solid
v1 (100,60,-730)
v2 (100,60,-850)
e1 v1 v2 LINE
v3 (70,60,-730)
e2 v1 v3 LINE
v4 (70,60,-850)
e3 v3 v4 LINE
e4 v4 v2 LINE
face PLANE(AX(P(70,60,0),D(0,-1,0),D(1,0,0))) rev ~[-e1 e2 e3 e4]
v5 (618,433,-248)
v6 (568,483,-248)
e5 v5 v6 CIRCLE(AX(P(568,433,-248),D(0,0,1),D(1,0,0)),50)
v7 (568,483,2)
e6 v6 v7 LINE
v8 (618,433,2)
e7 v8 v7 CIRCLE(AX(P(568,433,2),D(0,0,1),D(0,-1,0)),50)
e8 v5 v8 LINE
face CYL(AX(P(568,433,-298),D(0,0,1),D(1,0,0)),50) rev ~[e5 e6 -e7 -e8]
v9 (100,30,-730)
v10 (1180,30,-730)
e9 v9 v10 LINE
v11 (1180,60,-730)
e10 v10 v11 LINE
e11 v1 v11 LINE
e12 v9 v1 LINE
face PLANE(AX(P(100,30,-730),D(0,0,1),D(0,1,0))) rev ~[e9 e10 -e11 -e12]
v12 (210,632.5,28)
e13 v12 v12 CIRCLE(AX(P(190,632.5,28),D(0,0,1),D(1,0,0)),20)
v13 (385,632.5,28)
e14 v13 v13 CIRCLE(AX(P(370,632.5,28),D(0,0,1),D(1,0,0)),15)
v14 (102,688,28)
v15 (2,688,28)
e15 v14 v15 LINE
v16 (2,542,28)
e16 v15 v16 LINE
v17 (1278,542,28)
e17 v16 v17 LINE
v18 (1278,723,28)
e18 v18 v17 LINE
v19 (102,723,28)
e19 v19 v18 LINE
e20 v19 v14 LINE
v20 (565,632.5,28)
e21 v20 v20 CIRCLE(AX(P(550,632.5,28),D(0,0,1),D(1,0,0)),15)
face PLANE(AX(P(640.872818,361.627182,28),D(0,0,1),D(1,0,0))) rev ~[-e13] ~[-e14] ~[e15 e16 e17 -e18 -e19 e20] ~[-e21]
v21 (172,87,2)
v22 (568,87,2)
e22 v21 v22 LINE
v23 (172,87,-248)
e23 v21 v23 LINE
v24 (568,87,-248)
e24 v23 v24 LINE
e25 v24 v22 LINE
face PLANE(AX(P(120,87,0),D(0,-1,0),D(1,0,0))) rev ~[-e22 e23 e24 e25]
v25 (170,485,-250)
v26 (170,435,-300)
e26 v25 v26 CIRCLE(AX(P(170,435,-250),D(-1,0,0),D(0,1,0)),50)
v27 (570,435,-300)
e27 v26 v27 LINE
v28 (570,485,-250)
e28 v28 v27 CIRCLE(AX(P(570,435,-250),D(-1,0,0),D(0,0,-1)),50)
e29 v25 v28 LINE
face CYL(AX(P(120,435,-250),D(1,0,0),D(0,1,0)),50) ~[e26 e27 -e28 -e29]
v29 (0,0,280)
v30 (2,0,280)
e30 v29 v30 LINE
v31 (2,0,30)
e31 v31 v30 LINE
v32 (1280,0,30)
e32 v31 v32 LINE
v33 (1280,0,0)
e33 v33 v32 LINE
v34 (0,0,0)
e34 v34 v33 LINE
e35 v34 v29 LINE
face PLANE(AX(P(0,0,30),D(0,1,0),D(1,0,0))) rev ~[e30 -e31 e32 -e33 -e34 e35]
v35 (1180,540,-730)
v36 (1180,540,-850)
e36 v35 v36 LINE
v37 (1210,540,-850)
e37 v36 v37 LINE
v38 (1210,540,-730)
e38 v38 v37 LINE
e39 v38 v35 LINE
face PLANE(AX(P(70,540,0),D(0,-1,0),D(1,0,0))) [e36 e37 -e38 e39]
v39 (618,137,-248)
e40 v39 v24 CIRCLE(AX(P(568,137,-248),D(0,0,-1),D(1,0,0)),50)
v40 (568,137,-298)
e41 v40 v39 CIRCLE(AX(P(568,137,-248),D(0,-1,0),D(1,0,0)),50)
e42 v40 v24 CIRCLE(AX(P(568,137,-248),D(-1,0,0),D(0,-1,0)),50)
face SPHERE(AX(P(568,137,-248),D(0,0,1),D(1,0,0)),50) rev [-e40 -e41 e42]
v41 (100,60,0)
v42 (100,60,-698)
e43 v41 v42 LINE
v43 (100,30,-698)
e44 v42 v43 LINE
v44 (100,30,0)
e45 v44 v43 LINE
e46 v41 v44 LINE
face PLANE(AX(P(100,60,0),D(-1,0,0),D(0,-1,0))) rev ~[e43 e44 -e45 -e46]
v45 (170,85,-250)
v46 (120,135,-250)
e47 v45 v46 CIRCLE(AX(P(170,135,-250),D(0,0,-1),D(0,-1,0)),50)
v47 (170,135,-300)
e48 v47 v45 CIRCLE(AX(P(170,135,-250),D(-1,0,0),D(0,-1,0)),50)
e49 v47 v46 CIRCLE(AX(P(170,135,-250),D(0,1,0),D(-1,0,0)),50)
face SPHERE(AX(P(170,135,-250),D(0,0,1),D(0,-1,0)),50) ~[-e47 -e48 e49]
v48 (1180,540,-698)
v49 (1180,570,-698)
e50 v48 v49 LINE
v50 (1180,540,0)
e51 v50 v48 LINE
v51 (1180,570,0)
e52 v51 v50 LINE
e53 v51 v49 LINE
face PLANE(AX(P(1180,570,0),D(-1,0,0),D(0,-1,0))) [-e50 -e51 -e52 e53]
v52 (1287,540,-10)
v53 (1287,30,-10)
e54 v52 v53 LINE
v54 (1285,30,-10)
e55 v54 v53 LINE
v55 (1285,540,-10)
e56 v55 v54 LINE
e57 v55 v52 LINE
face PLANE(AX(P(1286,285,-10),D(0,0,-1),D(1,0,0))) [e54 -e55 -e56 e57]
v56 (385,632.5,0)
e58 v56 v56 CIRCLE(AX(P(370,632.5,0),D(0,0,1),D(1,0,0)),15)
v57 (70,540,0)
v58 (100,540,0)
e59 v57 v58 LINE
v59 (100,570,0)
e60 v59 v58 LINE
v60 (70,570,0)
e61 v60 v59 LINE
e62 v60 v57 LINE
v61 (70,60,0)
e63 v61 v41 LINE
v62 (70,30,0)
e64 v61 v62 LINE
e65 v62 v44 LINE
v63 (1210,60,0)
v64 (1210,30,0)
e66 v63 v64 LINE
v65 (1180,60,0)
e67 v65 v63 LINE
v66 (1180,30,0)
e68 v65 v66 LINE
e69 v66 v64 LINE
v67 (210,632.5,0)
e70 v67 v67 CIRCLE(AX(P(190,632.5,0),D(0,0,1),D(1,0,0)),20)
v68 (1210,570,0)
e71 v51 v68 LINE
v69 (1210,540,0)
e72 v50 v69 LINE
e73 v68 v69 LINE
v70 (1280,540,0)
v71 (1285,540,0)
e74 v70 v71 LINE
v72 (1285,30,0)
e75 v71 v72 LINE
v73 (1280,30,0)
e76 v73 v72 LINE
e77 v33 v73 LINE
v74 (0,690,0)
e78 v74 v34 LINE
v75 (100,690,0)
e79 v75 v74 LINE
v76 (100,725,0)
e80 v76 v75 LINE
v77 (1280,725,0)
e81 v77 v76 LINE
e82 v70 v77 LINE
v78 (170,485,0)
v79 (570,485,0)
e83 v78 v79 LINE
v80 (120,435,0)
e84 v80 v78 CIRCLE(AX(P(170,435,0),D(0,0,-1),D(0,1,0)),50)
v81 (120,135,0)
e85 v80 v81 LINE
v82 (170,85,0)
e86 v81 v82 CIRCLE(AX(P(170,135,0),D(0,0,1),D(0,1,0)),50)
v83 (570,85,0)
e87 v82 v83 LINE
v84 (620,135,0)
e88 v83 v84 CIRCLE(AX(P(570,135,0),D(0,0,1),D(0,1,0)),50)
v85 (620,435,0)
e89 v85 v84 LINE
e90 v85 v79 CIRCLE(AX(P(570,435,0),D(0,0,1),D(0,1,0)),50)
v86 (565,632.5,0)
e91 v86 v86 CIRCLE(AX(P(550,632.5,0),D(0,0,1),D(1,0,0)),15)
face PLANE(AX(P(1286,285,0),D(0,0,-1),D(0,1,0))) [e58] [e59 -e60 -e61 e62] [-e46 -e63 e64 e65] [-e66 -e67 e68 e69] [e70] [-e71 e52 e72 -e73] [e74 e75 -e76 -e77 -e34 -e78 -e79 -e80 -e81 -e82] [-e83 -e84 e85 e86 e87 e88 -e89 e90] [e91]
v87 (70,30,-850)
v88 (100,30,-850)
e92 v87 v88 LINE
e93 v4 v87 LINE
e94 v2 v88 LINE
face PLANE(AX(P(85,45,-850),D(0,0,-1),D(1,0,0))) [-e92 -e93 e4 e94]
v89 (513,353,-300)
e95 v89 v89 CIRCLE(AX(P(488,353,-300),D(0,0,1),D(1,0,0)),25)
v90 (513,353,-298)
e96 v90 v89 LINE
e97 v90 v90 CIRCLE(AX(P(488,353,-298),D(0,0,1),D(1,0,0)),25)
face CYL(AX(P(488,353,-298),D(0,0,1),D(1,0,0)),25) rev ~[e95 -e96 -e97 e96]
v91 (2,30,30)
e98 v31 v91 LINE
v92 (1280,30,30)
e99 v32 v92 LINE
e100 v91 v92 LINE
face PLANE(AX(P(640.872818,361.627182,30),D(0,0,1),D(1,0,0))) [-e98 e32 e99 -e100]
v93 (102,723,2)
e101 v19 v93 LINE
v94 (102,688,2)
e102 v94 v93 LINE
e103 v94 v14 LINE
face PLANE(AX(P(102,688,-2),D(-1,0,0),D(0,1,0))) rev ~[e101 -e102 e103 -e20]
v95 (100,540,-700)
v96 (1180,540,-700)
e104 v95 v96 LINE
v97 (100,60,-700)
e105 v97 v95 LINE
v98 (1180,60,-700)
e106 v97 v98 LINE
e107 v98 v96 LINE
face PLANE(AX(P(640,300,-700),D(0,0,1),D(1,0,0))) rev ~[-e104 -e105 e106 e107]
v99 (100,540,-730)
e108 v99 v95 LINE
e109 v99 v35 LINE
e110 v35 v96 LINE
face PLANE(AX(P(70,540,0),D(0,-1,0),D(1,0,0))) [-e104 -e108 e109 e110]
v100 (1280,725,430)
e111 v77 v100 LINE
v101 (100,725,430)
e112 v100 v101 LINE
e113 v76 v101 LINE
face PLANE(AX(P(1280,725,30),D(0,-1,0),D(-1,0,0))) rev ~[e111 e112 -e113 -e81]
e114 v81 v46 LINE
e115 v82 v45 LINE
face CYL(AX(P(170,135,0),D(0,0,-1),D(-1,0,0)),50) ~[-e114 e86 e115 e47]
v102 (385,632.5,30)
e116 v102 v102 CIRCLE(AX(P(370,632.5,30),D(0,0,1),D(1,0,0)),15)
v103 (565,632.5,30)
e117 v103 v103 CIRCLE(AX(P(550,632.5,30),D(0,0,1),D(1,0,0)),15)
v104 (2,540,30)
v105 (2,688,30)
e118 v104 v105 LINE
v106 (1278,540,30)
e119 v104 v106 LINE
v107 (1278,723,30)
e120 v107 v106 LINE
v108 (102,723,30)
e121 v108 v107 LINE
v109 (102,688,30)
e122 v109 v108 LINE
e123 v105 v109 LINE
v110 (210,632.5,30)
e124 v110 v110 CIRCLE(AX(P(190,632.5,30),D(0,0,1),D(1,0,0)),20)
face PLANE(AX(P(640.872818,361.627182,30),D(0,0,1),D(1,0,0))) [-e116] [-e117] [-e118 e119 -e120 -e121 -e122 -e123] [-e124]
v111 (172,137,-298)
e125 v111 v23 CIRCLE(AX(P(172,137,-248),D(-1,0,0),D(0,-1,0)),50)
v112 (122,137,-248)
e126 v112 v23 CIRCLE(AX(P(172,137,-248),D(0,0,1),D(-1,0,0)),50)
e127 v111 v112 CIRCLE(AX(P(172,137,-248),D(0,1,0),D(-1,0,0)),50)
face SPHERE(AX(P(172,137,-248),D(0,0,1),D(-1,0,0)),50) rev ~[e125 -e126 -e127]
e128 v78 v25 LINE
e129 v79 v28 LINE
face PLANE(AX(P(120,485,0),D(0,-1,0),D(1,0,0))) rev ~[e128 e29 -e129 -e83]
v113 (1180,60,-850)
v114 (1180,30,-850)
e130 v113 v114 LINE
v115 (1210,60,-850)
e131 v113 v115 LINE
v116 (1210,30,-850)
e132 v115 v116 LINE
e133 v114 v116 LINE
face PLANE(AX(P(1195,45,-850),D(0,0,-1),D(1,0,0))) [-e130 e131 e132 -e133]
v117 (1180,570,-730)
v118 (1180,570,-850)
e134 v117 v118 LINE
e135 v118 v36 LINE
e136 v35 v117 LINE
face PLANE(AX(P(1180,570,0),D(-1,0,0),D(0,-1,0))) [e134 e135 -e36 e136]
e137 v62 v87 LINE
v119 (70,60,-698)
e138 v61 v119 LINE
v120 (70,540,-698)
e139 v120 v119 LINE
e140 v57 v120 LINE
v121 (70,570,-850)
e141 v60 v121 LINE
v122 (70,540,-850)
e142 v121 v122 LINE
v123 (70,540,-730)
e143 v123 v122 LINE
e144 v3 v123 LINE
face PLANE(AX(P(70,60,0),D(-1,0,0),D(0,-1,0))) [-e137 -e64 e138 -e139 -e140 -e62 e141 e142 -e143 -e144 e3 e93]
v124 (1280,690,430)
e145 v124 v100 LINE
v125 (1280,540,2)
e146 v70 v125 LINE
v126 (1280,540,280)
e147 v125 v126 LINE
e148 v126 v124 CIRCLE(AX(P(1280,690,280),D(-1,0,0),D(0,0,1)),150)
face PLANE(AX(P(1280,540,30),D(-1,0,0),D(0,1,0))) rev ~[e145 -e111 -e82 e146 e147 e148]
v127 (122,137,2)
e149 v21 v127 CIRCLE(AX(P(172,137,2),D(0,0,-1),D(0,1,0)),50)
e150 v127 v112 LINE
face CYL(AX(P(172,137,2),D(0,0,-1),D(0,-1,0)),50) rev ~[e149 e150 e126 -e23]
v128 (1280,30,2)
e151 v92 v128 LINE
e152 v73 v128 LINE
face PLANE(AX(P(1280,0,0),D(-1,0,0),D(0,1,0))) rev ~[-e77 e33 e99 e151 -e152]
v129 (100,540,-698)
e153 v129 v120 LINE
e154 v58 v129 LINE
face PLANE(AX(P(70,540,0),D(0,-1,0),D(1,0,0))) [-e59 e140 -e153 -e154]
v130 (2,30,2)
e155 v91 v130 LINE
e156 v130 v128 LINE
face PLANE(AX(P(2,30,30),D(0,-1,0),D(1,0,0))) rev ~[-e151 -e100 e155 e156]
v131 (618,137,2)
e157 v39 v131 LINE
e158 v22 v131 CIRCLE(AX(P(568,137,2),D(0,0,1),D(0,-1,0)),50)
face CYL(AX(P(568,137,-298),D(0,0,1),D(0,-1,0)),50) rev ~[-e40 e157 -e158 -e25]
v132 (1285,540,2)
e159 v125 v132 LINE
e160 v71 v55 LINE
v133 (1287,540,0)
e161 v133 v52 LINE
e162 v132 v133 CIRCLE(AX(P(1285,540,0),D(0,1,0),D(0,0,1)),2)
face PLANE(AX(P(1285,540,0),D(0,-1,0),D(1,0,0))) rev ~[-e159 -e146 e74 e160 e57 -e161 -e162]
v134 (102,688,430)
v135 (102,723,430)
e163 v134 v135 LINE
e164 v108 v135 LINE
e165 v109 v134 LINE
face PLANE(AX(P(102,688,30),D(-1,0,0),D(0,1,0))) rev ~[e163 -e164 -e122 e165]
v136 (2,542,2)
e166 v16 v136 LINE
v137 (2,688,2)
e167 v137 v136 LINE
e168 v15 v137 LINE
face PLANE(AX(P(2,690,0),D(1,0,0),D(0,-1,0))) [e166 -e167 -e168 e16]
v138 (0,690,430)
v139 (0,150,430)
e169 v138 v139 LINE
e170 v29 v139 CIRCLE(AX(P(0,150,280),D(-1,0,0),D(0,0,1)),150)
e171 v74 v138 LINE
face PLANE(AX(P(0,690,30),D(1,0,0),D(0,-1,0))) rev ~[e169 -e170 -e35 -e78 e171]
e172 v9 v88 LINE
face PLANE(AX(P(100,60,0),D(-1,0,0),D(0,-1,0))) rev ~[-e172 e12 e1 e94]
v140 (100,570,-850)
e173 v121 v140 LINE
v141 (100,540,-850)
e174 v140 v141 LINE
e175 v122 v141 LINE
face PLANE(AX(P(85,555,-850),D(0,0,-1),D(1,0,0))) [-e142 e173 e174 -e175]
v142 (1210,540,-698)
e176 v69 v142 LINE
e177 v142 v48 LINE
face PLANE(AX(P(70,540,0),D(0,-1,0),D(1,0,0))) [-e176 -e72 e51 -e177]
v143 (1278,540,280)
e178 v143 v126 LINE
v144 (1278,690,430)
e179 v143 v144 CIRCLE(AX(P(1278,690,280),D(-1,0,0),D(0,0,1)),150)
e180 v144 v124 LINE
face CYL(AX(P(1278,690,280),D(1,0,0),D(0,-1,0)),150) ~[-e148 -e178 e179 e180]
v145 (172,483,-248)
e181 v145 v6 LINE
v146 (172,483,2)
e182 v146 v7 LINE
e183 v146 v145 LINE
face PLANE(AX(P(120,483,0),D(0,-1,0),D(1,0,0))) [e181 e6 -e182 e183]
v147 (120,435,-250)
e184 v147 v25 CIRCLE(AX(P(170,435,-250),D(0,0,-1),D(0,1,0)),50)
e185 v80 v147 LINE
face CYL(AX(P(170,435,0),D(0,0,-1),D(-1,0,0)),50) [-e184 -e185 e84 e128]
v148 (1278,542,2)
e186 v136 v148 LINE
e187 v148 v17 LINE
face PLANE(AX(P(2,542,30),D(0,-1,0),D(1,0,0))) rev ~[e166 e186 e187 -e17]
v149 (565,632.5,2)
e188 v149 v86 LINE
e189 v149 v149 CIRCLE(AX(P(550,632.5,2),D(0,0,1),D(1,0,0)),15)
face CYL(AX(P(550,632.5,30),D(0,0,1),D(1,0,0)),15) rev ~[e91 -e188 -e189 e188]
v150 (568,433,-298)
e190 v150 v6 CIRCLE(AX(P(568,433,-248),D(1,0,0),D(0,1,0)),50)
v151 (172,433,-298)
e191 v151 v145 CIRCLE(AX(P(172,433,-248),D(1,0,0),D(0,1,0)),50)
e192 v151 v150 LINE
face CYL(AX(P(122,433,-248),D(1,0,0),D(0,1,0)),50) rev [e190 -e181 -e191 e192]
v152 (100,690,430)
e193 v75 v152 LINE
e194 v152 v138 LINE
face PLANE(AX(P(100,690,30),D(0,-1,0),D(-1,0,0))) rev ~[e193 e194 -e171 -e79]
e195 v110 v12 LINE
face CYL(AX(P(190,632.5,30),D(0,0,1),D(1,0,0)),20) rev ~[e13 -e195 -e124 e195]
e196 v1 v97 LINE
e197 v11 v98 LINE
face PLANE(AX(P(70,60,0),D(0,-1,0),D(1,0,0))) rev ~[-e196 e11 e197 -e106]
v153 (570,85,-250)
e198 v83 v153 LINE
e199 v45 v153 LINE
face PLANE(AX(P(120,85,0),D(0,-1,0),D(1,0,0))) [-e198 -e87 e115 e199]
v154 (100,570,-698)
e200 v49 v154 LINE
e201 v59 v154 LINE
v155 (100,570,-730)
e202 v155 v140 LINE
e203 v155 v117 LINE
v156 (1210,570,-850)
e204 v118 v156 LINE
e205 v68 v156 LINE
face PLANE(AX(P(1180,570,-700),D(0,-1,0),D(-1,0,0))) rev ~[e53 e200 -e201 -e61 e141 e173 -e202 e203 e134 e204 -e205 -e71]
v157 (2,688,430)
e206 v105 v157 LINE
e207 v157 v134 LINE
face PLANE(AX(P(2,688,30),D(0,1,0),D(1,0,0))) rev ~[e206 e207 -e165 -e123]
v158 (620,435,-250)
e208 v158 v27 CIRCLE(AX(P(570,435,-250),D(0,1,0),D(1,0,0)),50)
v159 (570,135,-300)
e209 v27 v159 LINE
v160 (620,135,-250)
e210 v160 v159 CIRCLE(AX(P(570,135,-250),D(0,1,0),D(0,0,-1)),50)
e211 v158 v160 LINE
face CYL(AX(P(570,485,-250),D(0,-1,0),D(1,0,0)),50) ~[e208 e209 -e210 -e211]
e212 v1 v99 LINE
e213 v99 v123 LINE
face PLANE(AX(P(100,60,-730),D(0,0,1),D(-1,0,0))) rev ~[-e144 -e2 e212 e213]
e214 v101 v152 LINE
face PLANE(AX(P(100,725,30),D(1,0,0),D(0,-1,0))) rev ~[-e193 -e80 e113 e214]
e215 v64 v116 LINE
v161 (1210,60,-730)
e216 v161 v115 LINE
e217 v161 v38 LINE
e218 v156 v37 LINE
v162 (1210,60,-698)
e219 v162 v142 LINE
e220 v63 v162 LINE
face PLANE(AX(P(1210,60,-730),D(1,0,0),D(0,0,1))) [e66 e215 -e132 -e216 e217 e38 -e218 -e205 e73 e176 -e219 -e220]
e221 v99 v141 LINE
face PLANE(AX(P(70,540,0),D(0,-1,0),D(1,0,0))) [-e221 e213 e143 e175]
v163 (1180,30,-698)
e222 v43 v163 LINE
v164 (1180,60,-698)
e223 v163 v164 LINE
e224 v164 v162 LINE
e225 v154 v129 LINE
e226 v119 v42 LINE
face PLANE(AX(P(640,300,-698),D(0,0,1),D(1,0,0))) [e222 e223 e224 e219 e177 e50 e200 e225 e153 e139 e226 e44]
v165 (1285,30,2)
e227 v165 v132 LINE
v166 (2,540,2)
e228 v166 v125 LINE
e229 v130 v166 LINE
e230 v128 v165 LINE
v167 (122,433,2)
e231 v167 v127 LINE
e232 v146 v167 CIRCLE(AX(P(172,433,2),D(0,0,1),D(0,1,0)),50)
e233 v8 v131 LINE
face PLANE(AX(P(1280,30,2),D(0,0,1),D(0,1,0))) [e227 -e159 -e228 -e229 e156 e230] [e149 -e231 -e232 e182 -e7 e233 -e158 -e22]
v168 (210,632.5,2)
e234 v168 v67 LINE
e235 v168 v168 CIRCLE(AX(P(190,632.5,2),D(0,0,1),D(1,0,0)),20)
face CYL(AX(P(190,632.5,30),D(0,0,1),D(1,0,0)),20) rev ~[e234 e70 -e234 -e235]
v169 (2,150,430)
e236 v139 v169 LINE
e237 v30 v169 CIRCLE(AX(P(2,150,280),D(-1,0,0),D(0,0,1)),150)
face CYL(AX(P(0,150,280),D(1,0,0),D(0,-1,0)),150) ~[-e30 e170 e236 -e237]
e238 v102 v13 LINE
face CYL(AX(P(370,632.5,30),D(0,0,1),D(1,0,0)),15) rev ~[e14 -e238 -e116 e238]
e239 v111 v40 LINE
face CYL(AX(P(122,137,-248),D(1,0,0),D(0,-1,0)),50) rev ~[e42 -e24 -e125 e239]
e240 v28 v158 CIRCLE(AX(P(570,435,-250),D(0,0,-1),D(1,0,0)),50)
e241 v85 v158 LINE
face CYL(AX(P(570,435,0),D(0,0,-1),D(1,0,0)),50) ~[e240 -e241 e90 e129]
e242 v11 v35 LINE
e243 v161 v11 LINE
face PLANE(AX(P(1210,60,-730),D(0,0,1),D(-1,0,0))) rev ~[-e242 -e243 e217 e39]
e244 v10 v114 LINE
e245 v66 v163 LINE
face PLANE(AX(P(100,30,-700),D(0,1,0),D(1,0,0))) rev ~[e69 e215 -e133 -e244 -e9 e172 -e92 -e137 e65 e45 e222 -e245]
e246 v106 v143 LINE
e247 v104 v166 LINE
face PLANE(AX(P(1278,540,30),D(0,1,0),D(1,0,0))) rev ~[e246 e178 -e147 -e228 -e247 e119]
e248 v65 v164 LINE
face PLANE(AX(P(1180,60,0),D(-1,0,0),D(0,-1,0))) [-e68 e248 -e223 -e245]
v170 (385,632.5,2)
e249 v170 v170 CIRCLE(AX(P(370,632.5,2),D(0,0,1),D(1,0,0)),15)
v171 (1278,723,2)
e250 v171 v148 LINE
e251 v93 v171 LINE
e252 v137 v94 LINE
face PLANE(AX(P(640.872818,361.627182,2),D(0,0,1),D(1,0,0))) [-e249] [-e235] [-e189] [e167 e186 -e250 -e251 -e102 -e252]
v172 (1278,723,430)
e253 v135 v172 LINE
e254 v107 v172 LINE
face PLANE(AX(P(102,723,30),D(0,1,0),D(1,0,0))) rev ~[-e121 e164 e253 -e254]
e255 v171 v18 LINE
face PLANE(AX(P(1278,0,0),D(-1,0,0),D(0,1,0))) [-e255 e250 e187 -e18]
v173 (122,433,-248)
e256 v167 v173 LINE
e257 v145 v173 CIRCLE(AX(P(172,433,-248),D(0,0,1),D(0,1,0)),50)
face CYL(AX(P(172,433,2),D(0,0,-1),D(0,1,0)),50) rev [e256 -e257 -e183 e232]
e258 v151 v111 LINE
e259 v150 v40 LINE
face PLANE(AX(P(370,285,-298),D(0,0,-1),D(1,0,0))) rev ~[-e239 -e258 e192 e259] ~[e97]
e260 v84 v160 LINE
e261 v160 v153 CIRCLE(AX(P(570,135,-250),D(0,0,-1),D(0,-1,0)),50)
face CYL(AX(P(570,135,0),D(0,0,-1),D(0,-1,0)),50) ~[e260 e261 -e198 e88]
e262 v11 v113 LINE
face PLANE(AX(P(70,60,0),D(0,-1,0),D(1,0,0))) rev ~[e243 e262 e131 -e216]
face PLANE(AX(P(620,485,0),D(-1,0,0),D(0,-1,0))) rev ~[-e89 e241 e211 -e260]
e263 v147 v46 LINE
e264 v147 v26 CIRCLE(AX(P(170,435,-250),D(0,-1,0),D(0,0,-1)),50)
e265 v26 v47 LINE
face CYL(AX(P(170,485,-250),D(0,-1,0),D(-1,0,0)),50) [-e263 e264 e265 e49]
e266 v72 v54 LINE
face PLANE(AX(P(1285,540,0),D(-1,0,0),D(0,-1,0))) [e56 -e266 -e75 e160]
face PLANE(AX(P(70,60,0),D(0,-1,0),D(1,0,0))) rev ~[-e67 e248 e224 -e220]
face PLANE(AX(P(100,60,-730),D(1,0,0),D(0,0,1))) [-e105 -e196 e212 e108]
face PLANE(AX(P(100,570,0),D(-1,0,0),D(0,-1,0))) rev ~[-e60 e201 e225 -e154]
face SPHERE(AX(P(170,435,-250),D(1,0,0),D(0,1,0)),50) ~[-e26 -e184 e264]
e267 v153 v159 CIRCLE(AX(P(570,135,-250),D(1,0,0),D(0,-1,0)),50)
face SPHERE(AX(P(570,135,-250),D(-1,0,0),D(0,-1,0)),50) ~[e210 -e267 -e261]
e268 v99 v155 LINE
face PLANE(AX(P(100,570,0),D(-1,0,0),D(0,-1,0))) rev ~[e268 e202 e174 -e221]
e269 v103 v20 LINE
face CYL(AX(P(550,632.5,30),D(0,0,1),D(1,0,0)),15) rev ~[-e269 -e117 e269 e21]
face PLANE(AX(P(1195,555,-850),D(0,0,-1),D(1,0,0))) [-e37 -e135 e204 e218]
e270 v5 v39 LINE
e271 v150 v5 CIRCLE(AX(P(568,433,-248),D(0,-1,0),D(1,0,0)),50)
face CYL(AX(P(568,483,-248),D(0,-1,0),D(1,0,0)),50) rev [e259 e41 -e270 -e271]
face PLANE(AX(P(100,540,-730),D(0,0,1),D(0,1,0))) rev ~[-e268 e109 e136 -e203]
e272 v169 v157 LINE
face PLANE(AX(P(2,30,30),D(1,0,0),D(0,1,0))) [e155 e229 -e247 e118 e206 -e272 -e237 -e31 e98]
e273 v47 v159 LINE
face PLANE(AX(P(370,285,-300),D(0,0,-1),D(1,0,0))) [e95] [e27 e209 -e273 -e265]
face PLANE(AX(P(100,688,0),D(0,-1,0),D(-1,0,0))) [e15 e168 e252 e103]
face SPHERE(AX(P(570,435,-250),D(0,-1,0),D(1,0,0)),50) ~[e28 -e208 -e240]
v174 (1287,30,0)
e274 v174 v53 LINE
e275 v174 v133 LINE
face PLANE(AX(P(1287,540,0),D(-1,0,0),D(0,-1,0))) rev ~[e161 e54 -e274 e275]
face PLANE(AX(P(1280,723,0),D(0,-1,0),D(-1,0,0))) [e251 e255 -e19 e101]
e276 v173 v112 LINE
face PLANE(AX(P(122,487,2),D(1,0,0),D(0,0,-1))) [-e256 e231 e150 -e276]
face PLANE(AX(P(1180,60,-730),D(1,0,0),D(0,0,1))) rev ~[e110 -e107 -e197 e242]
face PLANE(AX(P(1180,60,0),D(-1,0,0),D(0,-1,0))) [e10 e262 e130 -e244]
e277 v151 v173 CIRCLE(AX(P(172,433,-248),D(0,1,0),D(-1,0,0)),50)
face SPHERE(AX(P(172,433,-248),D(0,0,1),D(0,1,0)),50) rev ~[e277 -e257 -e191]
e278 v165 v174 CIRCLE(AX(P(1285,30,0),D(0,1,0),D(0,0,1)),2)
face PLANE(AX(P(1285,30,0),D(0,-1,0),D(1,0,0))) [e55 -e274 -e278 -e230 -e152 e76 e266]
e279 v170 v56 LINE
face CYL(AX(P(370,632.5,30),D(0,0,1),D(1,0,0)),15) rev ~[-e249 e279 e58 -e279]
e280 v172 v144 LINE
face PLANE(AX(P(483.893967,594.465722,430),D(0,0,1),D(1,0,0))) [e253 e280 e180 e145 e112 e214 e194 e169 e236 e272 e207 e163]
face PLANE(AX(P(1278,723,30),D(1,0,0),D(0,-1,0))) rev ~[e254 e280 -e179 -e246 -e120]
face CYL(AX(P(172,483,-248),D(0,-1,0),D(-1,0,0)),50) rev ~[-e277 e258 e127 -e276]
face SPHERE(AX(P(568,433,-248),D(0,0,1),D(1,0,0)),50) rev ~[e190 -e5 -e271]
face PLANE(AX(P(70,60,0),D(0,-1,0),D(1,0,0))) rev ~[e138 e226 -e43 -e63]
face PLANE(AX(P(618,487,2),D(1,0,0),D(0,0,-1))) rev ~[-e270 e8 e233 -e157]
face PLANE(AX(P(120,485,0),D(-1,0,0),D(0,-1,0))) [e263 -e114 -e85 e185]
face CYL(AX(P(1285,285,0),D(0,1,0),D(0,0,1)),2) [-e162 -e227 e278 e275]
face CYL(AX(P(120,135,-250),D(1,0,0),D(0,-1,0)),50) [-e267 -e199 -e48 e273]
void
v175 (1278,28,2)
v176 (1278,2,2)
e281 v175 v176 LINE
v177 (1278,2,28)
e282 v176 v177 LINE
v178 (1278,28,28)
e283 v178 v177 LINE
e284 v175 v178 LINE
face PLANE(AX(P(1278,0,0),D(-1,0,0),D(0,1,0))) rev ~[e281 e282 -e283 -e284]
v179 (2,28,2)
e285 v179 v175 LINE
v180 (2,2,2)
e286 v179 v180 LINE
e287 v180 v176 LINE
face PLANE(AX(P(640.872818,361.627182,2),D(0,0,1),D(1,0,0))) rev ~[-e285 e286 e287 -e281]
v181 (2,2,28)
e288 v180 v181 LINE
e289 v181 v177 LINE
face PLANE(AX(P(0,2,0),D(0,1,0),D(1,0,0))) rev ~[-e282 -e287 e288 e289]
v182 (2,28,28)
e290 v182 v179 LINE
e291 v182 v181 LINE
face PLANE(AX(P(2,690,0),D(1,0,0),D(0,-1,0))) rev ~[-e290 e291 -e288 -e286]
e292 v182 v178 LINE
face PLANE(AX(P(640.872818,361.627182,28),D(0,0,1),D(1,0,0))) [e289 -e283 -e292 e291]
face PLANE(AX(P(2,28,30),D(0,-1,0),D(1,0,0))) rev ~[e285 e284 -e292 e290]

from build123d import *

# Parameters (mm, degrees)
F1_DEPTH    = 30
F2_W        = 1278
F2_H        = 510
F3_DEPTH    = 28
F4_W        = 500
F4_H        = 400
F5_DEPTH    = 300
F6_T        = 2
F6_T3_DEPTH = 34
F6_T5_DEPTH = 404
F6_T7_DEPTH = 504
F6_T9_DEPTH = 32
F7_R        = 50
F8_R        = 25
F9_DEPTH    = 2
F10_R       = 15
F10_R_2     = 20
F11_DEPTH   = 30
F12_W       = 510
F12_H       = 2
F13_DEPTH   = 5
F14_W       = 510
F14_H       = 2
F15_ANGLE   = 90
F16_W       = 2
F16_H       = 510
F17_DEPTH   = 10
F19_DEPTH   = 400
F20_R       = 150
F21_W       = 30
F21_H       = 30
F22_DEPTH   = 850
F23_W       = 30
F23_H       = 30
F24_DEPTH   = 1080
F25_W       = 30
F25_H       = 30
F26_DEPTH   = 480
F28_DEPTH   = 2


# Not quite as in the source:
# - a shell that OpenCascade refuses in one call is made with other operations: the cavity is built on its own and cut out


with BuildPart() as f1:
    # F0 (on Top) → F1 (new body)
    with BuildSketch(Plane.XY):
        Polygon((0, 690), (0, 0), (1280, 0), (1280, 725), (100, 725), (100, 690), align=None)
    extrude(amount=F1_DEPTH)

    # F2 (on face) → F3 (cut)
    with BuildSketch(Plane.XY.offset(30)):
        with Locations((641, 285)):
            Rectangle(F2_W, F2_H)
    extrude(amount=-F3_DEPTH, mode=Mode.SUBTRACT)

    # F4 (on face) → F5 (join)
    with BuildSketch(Plane(origin=(0, 0, 0), x_dir=(1, 0, 0), z_dir=(0, 0, -1))):
        with Locations((370, -285)):
            Rectangle(F4_W, F4_H)
    extrude(amount=F5_DEPTH)

    # F6: shell of thickness 2, made by hand


with BuildPart() as f6_core1:
    # F6_t2: copy of F1
    add(f1.part)

    # the walls: a layer under each face that stays
    f6_faces = [f6_core1.faces().sort_by_distance(p)[0] for p in [
        (0, 345, 15),
        (50, 690, 15),
        (640, 0, 15),
        (640, 362.5, 0),
        (213.3333333333, 604.1666666667, 30),
        (100, 707.5, 15),
        (1280, 604.1666666667, 25),
        (690, 725, 15),
        (620, 285, -150),
        (370, 485, -150),
        (120, 285, -150),
        (370, 85, -150),
        (641, 540, 16),
        (2, 285, 16),
        (641, 30, 16),
        (370, 285, -300),
    ]]
    thicken(f6_faces, amount=-F6_T, mode=Mode.SUBTRACT)

    # F6_s4 → F6_t3 (cut)
    with BuildSketch(Plane.XY.offset(-2)):
        Polygon((99.98, 690.02), (100, 688), (102, 688), (102, 690), align=None)
    extrude(amount=F6_T3_DEPTH, mode=Mode.SUBTRACT)

    # F6_s6 → F6_t5 (cut)
    with BuildSketch(Plane.XZ.offset(-487)):
        Polygon((620.02, -0.02), (620, 2), (618, 2), (618, 0), align=None)
        Polygon((119.98, -0.02), (120, 2), (122, 2), (122, 0), align=None)
    extrude(amount=F6_T5_DEPTH, mode=Mode.SUBTRACT)

    # F6_s8 → F6_t7 (cut)
    with BuildSketch(Plane.YZ.offset(118)):
        Polygon((485.02, -0.02), (485, 2), (483, 2), (483, 0), align=None)
        Polygon((84.98, -0.02), (85, 2), (87, 2), (87, 0), align=None)
    extrude(amount=F6_T7_DEPTH, mode=Mode.SUBTRACT)

    # F6_s10 → F6_t9 (cut)
    with BuildSketch(Plane.XY):
        Polygon((2.02, 539.98), (2, 542), (0, 542), (0, 540), align=None)
        Polygon((2.02, 30.02), (0, 30), (0, 28), (2, 28), align=None)
    extrude(amount=F6_T9_DEPTH, mode=Mode.SUBTRACT)


with BuildPart() as f1_1:
    add(f1.part)

    # what is left inside the walls is the cavity
    f6_cavity = [f6_core1.part.solids().sort_by_distance(p)[0] for p in [
        (640, 10.666667, 2.02),
        (640, 602.333333, 27.98),
        (370, 351, -297.98),
    ]]
    add(f6_cavity, mode=Mode.SUBTRACT)

    # F7
    f7_edges = [f1_1.edges().sort_by_distance(p)[0] for p in [
        (122, 483, -148),
        (618, 483, -148),
        (122, 87, -148),
        (618, 87, -148),
        (618, 285, -298),
        (370, 483, -298),
        (122, 285, -298),
        (370, 87, -298),
        (120, 85, -150),
        (370, 85, -300),
        (620, 85, -150),
        (620, 285, -300),
        (620, 485, -150),
        (370, 485, -300),
        (120, 485, -150),
        (120, 285, -300),
    ]]
    fillet(f7_edges, radius=F7_R)

    # F8 (on face) → F9 (cut, through all)
    with BuildSketch(Plane.XY.offset(-298)):
        with Locations((488, 353)):
            Circle(F8_R)
    extrude(amount=-F9_DEPTH, mode=Mode.SUBTRACT)

    # F10 (on face) → F11 (cut, through all)
    with BuildSketch(Plane.XY.offset(30)):
        with Locations((550, 632.5)):
            Circle(F10_R)
        with Locations((370, 632.5)):
            Circle(F10_R)
        with Locations((190, 632.5)):
            Circle(F10_R_2)
    extrude(amount=-F11_DEPTH, mode=Mode.SUBTRACT)

    # F12 (on face) → F13 (join)
    with BuildSketch(Plane.YZ.offset(1280)):
        with Locations((285, 1)):
            Rectangle(F12_W, F12_H)
    extrude(amount=F13_DEPTH)

    # F14 (on face) → F15 (revolve)
    with BuildSketch(Plane.YZ.offset(1285)):
        with Locations((285, 1)):
            Rectangle(F14_W, F14_H)
    revolve(axis=Axis((1285, 285, 0), (0, 1, 0)), revolution_arc=F15_ANGLE)

    # F16 (on face) → F17 (join)
    with BuildSketch(Plane(origin=(0, 0, 0), x_dir=(1, 0, 0), z_dir=(0, 0, -1))):
        with Locations((1286, -285)):
            Rectangle(F16_W, F16_H)
    extrude(amount=F17_DEPTH)

    # F18 (on face) → F19 (join)
    with BuildSketch(Plane.XY.offset(30)):
        Polygon((1278, 540), (1280, 540), (1280, 725), (100, 725), (100, 690), (0, 690), (0, 0), (2, 0), (2, 688), (102, 688), (102, 723), (1278, 723), align=None)
    extrude(amount=F19_DEPTH)

    # F20
    f20_edges = [f1_1.edges().sort_by_distance(p)[0] for p in [
        (1279, 540, 430),
        (1, 0, 430),
    ]]
    fillet(f20_edges, radius=F20_R)

    # F21 (on face) → F22 (join)
    with BuildSketch(Plane(origin=(0, 0, 0), x_dir=(1, 0, 0), z_dir=(0, 0, -1))):
        with Locations((85, -45)):
            Rectangle(F21_W, F21_H)
        with Locations((1195, -45)):
            Rectangle(F21_W, F21_H)
        with Locations((1195, -555)):
            Rectangle(F21_W, F21_H)
        with Locations((85, -555)):
            Rectangle(F21_W, F21_H)
    extrude(amount=F22_DEPTH)

    # F23 (on face) → F24 (join, through all)
    with BuildSketch(Plane.YZ.offset(100)):
        with Locations((45, -715)):
            Rectangle(F23_W, F23_H)
        with Locations((555, -715)):
            Rectangle(F23_W, F23_H)
    extrude(amount=F24_DEPTH)

    # F25 (on face) → F26 (join, through all)
    with BuildSketch(Plane(origin=(0, 60, 0), x_dir=(-1, 0, 0), z_dir=(0, 1, 0))):
        with Locations((-1195, -715)):
            Rectangle(F25_W, F25_H)
        with Locations((-85, -715)):
            Rectangle(F25_W, F25_H)
    extrude(amount=F26_DEPTH)

    # F27 (on face) → F28 (join)
    with BuildSketch(Plane.XY.offset(-700)):
        Polygon((100, 60), (100, 30), (1180, 30), (1180, 60), (1210, 60), (1210, 540), (1180, 540), (1180, 570), (100, 570), (100, 540), (70, 540), (70, 60), align=None)
    extrude(amount=F28_DEPTH)


solid = f1_1.part
